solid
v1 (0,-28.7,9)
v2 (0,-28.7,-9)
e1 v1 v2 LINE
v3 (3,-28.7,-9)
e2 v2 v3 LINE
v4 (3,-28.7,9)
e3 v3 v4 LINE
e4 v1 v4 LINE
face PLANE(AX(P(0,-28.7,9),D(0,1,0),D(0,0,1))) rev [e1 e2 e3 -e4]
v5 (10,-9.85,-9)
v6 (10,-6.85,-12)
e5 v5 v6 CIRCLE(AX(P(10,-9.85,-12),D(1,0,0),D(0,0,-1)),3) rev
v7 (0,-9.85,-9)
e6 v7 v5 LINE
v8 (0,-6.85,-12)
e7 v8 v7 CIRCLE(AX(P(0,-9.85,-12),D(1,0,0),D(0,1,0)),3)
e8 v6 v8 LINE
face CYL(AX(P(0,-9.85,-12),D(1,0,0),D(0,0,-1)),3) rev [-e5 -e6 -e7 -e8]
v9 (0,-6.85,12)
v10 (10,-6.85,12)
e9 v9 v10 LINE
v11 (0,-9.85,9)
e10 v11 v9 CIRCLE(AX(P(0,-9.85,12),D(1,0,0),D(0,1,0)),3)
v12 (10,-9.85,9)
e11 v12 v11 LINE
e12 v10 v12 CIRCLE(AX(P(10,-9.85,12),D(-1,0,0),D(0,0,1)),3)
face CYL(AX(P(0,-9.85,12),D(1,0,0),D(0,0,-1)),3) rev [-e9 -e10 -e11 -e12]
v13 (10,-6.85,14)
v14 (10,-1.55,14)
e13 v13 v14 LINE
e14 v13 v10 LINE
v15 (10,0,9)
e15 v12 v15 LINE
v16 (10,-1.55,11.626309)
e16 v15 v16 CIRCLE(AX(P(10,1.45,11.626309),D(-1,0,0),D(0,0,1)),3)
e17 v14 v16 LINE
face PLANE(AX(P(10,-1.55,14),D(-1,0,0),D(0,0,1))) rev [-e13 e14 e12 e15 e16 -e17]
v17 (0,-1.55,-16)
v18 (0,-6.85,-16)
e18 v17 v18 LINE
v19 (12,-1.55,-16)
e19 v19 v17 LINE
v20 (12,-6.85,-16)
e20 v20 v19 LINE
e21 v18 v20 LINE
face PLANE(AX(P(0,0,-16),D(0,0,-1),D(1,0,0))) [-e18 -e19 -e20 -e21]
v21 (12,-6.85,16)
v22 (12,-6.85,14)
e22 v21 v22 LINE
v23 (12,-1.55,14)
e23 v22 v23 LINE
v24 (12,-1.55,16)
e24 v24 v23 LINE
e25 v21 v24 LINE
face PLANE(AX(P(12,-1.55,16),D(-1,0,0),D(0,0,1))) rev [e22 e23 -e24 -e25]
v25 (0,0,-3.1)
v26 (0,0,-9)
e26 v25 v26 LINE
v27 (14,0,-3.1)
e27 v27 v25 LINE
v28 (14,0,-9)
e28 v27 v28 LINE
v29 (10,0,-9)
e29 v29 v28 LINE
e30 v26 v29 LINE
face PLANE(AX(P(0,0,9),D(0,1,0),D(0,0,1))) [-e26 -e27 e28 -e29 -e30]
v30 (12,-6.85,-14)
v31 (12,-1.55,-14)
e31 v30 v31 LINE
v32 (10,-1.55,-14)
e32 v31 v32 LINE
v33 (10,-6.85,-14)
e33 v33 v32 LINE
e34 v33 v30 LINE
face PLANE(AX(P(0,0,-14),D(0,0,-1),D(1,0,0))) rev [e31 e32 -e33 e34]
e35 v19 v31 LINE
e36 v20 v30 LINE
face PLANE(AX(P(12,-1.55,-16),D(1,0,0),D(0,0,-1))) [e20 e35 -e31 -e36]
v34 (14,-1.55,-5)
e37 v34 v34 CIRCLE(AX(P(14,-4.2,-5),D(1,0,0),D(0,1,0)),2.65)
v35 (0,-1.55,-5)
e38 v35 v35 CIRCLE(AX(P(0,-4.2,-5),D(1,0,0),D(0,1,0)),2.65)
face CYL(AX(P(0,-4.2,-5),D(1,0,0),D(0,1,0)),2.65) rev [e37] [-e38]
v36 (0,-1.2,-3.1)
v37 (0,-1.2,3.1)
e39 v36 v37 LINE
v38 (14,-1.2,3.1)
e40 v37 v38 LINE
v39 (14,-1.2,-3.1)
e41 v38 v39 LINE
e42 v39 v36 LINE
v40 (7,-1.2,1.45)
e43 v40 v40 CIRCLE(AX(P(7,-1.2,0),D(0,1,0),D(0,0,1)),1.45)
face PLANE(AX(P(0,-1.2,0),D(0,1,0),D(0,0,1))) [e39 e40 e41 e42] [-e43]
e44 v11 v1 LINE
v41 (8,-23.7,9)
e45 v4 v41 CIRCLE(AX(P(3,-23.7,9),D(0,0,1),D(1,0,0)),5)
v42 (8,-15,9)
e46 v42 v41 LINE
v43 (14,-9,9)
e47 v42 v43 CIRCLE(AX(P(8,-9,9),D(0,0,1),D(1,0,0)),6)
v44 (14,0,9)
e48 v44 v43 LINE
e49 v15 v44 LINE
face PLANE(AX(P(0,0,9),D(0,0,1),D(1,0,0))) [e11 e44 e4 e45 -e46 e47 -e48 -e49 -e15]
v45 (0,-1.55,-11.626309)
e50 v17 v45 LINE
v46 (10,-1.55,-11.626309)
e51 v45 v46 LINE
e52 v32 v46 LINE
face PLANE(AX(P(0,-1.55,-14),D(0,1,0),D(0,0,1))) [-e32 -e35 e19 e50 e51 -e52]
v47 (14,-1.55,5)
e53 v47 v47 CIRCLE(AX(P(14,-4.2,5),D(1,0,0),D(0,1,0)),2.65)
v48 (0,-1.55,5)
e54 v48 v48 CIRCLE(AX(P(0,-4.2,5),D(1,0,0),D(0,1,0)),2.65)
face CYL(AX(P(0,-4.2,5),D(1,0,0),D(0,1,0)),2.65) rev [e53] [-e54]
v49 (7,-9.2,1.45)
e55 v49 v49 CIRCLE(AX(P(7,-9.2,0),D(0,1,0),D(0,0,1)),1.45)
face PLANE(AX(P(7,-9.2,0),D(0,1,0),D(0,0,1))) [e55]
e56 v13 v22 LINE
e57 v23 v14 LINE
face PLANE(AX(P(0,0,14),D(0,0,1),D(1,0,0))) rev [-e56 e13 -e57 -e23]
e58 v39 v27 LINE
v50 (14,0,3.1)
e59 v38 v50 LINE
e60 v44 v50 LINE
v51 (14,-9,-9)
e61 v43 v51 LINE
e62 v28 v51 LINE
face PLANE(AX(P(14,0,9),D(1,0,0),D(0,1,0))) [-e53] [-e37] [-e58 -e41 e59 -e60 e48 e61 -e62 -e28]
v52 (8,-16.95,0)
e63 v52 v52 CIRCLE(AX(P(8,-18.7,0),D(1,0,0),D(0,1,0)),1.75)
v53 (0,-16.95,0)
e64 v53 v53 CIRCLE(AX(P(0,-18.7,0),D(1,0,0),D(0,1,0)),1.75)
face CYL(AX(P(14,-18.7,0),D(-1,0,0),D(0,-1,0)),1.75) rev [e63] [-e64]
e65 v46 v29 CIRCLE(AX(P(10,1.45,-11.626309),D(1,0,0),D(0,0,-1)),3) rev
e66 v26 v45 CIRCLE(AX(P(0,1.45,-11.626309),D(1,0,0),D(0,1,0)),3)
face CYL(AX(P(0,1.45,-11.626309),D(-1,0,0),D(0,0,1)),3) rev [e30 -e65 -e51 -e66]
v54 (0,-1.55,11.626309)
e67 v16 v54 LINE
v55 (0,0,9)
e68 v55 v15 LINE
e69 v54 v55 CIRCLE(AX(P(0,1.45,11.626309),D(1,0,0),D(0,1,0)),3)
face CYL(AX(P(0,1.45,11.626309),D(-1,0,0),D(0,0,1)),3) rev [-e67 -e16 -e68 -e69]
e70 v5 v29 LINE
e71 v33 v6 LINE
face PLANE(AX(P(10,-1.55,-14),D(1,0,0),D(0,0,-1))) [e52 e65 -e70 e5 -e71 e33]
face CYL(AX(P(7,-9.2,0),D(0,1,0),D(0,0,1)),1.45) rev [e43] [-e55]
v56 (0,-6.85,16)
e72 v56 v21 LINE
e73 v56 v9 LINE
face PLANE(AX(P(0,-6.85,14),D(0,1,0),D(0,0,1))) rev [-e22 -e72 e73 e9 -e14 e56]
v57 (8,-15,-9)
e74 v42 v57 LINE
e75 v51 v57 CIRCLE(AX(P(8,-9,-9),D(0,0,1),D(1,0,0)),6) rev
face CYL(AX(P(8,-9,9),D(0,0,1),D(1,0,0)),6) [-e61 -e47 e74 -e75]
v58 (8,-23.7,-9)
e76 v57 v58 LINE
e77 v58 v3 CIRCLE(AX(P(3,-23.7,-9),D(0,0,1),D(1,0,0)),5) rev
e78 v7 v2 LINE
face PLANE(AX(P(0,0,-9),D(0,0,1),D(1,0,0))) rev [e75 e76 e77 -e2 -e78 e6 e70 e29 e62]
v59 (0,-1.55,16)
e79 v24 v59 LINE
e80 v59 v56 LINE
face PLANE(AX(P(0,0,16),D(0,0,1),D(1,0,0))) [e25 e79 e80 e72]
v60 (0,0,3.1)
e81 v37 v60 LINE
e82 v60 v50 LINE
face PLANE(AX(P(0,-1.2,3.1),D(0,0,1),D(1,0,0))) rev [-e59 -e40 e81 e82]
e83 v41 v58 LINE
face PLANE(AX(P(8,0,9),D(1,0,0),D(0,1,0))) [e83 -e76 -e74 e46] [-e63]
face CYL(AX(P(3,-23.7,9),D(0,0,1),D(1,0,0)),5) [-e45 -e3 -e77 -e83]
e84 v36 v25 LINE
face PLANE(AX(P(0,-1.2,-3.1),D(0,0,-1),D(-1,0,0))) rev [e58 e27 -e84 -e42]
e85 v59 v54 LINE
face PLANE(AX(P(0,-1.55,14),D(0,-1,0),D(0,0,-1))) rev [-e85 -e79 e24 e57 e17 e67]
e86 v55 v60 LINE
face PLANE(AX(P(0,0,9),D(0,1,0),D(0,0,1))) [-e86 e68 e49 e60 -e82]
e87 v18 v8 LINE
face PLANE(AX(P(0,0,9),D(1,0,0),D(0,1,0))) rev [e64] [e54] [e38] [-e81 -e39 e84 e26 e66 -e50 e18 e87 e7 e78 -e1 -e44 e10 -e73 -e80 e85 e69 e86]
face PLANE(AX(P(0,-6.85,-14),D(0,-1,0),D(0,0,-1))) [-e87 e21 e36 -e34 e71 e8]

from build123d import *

# Parameters (mm, degrees)
SKETCH1_W               = 6
SKETCH1_H               = 15
SKETCH1_W_2             = 8
SKETCH1_H_2             = 28.7
BOSS_EXTRUDE1_DEPTH     = 9
SKETCH2_R               = 2.65
CUT_EXTRUDE1_DEPTH      = 34.176648414
SKETCH5_W               = 10
SKETCH5_H               = 5.3
BOSS_EXTRUDE4_DEPTH     = 5
SKETCH6_W               = 12
SKETCH6_H               = 5.3
BOSS_EXTRUDE5_DEPTH     = 2
SKETCH7_W               = 14
SKETCH7_H               = 6.2
CUT_EXTRUDE2_DEPTH      = 1.2
SKETCH8_R               = 1.45
CUT_EXTRUDE3_DEPTH      = 8
CUT_EXTRUDE4_DEPTH      = 36.716802768
CUT_EXTRUDE4_DEPTH_BACK = 36.716802768
SKETCH9_R               = 1.75
FILLET1_R               = 5
FILLET2_R               = 6
FILLET3_R               = 3


# Some blends are built 0.0001 mm under size
with BuildPart() as part:
    # Sketch1 → Boss-Extrude1 (new, symmetric)
    with BuildSketch(Plane.XY):
        with Locations((11, -7.5)):
            Rectangle(SKETCH1_W, SKETCH1_H)
        with Locations((4, -14.35)):
            Rectangle(SKETCH1_W_2, SKETCH1_H_2)
    extrude(amount=BOSS_EXTRUDE1_DEPTH, both=True)

    # Sketch2 → Cut-Extrude1 (cut, through all)
    with BuildSketch(Plane(origin=(14, 0, 0), x_dir=(0, 0, -1), z_dir=(1, 0, 0))):
        with Locations(Location((5, -4.2, 0), (0, 0, 90))):
            Circle(SKETCH2_R)
        with Locations(Location((-5, -4.2, 0), (0, 0, 90))):
            Circle(SKETCH2_R)
    extrude(amount=-CUT_EXTRUDE1_DEPTH, mode=Mode.SUBTRACT)

    # Sketch5 → Boss-Extrude4 (add)
    with BuildSketch(Plane.XY.offset(9)):
        with Locations((5, -4.2)):
            Rectangle(SKETCH5_W, SKETCH5_H)
    boss_extrude4 = extrude(amount=BOSS_EXTRUDE4_DEPTH)

    # Sketch6 → Boss-Extrude5 (add)
    with BuildSketch(Plane.XY.offset(14)):
        with Locations((6, -4.2)):
            Rectangle(SKETCH6_W, SKETCH6_H)
    boss_extrude5 = extrude(amount=BOSS_EXTRUDE5_DEPTH)

    # Mirror2: Boss-Extrude4, Boss-Extrude5 across plane
    add(boss_extrude4.mirror(Plane.XY))
    add(boss_extrude5.mirror(Plane.XY))

    # Sketch7 → Cut-Extrude2 (cut)
    with BuildSketch(Plane(origin=(0, 0, 0), x_dir=(1, 0, 0), z_dir=(0, 1, 0))):
        with Locations((7, 0)):
            Rectangle(SKETCH7_W, SKETCH7_H)
    extrude(amount=-CUT_EXTRUDE2_DEPTH, mode=Mode.SUBTRACT)

    # Sketch8 → Cut-Extrude3 (cut)
    with BuildSketch(Plane(origin=(0, -1.2, 0), x_dir=(1, 0, 0), z_dir=(0, 1, 0))):
        with Locations(Location((7, 0, 0), (0, 0, 270))):
            Circle(SKETCH8_R)
    extrude(amount=-CUT_EXTRUDE3_DEPTH, mode=Mode.SUBTRACT)

    # Sketch9 → Cut-Extrude4 (cut, two sides: drawn at the far end of the back side and taken through both)
    with BuildSketch(Plane.ZY.offset(-CUT_EXTRUDE4_DEPTH_BACK)):
        with Locations(Location((0, -18.7, 0), (0, 0, 90))):
            Circle(SKETCH9_R)
    extrude(amount=CUT_EXTRUDE4_DEPTH + CUT_EXTRUDE4_DEPTH_BACK, mode=Mode.SUBTRACT)

    # Fillet1
    fillet1_edges = [part.edges().sort_by_distance(p)[0] for p in [
        (8, -28.7, 0),
    ]]
    fillet(fillet1_edges, radius=FILLET1_R)

    # Fillet2
    fillet2_edges = [part.edges().sort_by_distance(p)[0] for p in [
        (14, -15, 0),
    ]]
    fillet(fillet2_edges, radius=FILLET2_R - 0.0001)  # a hair under: the kernel refuses the full size

    # Fillet3
    # the kernel refuses this fillet: 3 mm, written as the material it adds along each edge
    with BuildSketch(Plane(origin=(10, -6.85, 9), x_dir=(0, -1, 0), z_dir=(-1, 0, 0))) as fillet3_piece_1:
        with BuildLine():
            CenterArc((FILLET3_R, FILLET3_R), FILLET3_R, 180, 90)
            Line((0, FILLET3_R), (-FILLET3_R * 0.02, FILLET3_R))
            Line((-FILLET3_R * 0.02, FILLET3_R), (-FILLET3_R * 0.02, -FILLET3_R * 0.02))
            Line((-FILLET3_R * 0.02, -FILLET3_R * 0.02), (FILLET3_R, -FILLET3_R * 0.02))
            Line((FILLET3_R, -FILLET3_R * 0.02), (FILLET3_R, 0))
        make_face()
    extrude(amount=10)
    with BuildSketch(Plane(origin=(0, -1.55, 9), x_dir=(0, 1, 0), z_dir=(1, 0, 0))) as fillet3_piece_2:
        with BuildLine():
            CenterArc((3, 2.626309197), FILLET3_R, 180, 61.09666546)
            Line((0, 2.626309197), (-0.06, 2.626309197))
            Line((-0.06, 2.626309197), (-0.06, 0))
            Line((-0.06, 0), (0, -0.06))
            ThreePointArc((0, -0.06), (0.775, -0.06), (1.521, -0.052526184))
            Line((1.521, -0.052526184), (1.55, 0))
        make_face()
    extrude(amount=10)
    with BuildSketch(Plane(origin=(10, -6.85, -9), x_dir=(0, -1, 0), z_dir=(-1, 0, 0))) as fillet3_piece_3:
        with BuildLine():
            CenterArc((FILLET3_R, -FILLET3_R), FILLET3_R, 90, 90)
            Line((0, -FILLET3_R), (-FILLET3_R * 0.02, -FILLET3_R))
            Line((-FILLET3_R * 0.02, -FILLET3_R), (-FILLET3_R * 0.02, FILLET3_R * 0.02))
            Line((-FILLET3_R * 0.02, FILLET3_R * 0.02), (FILLET3_R, FILLET3_R * 0.02))
            Line((FILLET3_R, FILLET3_R * 0.02), (FILLET3_R, 0))
        make_face()
    extrude(amount=10)
    with BuildSketch(Plane(origin=(0, -1.55, -9), x_dir=(0, 1, 0), z_dir=(1, 0, 0))) as fillet3_piece_4:
        with BuildLine():
            CenterArc((3, -2.626309197), FILLET3_R, 118.90333454, 61.09666546)
            Line((0, -2.626309197), (-0.06, -2.626309197))
            Line((-0.06, -2.626309197), (-0.06, 0))
            Line((-0.06, 0), (0, 0.06))
            ThreePointArc((0, 0.06), (0.775, 0.06), (1.521, 0.052526184))
            Line((1.521, 0.052526184), (1.55, 0))
        make_face()
    extrude(amount=10)


solid = part.part
